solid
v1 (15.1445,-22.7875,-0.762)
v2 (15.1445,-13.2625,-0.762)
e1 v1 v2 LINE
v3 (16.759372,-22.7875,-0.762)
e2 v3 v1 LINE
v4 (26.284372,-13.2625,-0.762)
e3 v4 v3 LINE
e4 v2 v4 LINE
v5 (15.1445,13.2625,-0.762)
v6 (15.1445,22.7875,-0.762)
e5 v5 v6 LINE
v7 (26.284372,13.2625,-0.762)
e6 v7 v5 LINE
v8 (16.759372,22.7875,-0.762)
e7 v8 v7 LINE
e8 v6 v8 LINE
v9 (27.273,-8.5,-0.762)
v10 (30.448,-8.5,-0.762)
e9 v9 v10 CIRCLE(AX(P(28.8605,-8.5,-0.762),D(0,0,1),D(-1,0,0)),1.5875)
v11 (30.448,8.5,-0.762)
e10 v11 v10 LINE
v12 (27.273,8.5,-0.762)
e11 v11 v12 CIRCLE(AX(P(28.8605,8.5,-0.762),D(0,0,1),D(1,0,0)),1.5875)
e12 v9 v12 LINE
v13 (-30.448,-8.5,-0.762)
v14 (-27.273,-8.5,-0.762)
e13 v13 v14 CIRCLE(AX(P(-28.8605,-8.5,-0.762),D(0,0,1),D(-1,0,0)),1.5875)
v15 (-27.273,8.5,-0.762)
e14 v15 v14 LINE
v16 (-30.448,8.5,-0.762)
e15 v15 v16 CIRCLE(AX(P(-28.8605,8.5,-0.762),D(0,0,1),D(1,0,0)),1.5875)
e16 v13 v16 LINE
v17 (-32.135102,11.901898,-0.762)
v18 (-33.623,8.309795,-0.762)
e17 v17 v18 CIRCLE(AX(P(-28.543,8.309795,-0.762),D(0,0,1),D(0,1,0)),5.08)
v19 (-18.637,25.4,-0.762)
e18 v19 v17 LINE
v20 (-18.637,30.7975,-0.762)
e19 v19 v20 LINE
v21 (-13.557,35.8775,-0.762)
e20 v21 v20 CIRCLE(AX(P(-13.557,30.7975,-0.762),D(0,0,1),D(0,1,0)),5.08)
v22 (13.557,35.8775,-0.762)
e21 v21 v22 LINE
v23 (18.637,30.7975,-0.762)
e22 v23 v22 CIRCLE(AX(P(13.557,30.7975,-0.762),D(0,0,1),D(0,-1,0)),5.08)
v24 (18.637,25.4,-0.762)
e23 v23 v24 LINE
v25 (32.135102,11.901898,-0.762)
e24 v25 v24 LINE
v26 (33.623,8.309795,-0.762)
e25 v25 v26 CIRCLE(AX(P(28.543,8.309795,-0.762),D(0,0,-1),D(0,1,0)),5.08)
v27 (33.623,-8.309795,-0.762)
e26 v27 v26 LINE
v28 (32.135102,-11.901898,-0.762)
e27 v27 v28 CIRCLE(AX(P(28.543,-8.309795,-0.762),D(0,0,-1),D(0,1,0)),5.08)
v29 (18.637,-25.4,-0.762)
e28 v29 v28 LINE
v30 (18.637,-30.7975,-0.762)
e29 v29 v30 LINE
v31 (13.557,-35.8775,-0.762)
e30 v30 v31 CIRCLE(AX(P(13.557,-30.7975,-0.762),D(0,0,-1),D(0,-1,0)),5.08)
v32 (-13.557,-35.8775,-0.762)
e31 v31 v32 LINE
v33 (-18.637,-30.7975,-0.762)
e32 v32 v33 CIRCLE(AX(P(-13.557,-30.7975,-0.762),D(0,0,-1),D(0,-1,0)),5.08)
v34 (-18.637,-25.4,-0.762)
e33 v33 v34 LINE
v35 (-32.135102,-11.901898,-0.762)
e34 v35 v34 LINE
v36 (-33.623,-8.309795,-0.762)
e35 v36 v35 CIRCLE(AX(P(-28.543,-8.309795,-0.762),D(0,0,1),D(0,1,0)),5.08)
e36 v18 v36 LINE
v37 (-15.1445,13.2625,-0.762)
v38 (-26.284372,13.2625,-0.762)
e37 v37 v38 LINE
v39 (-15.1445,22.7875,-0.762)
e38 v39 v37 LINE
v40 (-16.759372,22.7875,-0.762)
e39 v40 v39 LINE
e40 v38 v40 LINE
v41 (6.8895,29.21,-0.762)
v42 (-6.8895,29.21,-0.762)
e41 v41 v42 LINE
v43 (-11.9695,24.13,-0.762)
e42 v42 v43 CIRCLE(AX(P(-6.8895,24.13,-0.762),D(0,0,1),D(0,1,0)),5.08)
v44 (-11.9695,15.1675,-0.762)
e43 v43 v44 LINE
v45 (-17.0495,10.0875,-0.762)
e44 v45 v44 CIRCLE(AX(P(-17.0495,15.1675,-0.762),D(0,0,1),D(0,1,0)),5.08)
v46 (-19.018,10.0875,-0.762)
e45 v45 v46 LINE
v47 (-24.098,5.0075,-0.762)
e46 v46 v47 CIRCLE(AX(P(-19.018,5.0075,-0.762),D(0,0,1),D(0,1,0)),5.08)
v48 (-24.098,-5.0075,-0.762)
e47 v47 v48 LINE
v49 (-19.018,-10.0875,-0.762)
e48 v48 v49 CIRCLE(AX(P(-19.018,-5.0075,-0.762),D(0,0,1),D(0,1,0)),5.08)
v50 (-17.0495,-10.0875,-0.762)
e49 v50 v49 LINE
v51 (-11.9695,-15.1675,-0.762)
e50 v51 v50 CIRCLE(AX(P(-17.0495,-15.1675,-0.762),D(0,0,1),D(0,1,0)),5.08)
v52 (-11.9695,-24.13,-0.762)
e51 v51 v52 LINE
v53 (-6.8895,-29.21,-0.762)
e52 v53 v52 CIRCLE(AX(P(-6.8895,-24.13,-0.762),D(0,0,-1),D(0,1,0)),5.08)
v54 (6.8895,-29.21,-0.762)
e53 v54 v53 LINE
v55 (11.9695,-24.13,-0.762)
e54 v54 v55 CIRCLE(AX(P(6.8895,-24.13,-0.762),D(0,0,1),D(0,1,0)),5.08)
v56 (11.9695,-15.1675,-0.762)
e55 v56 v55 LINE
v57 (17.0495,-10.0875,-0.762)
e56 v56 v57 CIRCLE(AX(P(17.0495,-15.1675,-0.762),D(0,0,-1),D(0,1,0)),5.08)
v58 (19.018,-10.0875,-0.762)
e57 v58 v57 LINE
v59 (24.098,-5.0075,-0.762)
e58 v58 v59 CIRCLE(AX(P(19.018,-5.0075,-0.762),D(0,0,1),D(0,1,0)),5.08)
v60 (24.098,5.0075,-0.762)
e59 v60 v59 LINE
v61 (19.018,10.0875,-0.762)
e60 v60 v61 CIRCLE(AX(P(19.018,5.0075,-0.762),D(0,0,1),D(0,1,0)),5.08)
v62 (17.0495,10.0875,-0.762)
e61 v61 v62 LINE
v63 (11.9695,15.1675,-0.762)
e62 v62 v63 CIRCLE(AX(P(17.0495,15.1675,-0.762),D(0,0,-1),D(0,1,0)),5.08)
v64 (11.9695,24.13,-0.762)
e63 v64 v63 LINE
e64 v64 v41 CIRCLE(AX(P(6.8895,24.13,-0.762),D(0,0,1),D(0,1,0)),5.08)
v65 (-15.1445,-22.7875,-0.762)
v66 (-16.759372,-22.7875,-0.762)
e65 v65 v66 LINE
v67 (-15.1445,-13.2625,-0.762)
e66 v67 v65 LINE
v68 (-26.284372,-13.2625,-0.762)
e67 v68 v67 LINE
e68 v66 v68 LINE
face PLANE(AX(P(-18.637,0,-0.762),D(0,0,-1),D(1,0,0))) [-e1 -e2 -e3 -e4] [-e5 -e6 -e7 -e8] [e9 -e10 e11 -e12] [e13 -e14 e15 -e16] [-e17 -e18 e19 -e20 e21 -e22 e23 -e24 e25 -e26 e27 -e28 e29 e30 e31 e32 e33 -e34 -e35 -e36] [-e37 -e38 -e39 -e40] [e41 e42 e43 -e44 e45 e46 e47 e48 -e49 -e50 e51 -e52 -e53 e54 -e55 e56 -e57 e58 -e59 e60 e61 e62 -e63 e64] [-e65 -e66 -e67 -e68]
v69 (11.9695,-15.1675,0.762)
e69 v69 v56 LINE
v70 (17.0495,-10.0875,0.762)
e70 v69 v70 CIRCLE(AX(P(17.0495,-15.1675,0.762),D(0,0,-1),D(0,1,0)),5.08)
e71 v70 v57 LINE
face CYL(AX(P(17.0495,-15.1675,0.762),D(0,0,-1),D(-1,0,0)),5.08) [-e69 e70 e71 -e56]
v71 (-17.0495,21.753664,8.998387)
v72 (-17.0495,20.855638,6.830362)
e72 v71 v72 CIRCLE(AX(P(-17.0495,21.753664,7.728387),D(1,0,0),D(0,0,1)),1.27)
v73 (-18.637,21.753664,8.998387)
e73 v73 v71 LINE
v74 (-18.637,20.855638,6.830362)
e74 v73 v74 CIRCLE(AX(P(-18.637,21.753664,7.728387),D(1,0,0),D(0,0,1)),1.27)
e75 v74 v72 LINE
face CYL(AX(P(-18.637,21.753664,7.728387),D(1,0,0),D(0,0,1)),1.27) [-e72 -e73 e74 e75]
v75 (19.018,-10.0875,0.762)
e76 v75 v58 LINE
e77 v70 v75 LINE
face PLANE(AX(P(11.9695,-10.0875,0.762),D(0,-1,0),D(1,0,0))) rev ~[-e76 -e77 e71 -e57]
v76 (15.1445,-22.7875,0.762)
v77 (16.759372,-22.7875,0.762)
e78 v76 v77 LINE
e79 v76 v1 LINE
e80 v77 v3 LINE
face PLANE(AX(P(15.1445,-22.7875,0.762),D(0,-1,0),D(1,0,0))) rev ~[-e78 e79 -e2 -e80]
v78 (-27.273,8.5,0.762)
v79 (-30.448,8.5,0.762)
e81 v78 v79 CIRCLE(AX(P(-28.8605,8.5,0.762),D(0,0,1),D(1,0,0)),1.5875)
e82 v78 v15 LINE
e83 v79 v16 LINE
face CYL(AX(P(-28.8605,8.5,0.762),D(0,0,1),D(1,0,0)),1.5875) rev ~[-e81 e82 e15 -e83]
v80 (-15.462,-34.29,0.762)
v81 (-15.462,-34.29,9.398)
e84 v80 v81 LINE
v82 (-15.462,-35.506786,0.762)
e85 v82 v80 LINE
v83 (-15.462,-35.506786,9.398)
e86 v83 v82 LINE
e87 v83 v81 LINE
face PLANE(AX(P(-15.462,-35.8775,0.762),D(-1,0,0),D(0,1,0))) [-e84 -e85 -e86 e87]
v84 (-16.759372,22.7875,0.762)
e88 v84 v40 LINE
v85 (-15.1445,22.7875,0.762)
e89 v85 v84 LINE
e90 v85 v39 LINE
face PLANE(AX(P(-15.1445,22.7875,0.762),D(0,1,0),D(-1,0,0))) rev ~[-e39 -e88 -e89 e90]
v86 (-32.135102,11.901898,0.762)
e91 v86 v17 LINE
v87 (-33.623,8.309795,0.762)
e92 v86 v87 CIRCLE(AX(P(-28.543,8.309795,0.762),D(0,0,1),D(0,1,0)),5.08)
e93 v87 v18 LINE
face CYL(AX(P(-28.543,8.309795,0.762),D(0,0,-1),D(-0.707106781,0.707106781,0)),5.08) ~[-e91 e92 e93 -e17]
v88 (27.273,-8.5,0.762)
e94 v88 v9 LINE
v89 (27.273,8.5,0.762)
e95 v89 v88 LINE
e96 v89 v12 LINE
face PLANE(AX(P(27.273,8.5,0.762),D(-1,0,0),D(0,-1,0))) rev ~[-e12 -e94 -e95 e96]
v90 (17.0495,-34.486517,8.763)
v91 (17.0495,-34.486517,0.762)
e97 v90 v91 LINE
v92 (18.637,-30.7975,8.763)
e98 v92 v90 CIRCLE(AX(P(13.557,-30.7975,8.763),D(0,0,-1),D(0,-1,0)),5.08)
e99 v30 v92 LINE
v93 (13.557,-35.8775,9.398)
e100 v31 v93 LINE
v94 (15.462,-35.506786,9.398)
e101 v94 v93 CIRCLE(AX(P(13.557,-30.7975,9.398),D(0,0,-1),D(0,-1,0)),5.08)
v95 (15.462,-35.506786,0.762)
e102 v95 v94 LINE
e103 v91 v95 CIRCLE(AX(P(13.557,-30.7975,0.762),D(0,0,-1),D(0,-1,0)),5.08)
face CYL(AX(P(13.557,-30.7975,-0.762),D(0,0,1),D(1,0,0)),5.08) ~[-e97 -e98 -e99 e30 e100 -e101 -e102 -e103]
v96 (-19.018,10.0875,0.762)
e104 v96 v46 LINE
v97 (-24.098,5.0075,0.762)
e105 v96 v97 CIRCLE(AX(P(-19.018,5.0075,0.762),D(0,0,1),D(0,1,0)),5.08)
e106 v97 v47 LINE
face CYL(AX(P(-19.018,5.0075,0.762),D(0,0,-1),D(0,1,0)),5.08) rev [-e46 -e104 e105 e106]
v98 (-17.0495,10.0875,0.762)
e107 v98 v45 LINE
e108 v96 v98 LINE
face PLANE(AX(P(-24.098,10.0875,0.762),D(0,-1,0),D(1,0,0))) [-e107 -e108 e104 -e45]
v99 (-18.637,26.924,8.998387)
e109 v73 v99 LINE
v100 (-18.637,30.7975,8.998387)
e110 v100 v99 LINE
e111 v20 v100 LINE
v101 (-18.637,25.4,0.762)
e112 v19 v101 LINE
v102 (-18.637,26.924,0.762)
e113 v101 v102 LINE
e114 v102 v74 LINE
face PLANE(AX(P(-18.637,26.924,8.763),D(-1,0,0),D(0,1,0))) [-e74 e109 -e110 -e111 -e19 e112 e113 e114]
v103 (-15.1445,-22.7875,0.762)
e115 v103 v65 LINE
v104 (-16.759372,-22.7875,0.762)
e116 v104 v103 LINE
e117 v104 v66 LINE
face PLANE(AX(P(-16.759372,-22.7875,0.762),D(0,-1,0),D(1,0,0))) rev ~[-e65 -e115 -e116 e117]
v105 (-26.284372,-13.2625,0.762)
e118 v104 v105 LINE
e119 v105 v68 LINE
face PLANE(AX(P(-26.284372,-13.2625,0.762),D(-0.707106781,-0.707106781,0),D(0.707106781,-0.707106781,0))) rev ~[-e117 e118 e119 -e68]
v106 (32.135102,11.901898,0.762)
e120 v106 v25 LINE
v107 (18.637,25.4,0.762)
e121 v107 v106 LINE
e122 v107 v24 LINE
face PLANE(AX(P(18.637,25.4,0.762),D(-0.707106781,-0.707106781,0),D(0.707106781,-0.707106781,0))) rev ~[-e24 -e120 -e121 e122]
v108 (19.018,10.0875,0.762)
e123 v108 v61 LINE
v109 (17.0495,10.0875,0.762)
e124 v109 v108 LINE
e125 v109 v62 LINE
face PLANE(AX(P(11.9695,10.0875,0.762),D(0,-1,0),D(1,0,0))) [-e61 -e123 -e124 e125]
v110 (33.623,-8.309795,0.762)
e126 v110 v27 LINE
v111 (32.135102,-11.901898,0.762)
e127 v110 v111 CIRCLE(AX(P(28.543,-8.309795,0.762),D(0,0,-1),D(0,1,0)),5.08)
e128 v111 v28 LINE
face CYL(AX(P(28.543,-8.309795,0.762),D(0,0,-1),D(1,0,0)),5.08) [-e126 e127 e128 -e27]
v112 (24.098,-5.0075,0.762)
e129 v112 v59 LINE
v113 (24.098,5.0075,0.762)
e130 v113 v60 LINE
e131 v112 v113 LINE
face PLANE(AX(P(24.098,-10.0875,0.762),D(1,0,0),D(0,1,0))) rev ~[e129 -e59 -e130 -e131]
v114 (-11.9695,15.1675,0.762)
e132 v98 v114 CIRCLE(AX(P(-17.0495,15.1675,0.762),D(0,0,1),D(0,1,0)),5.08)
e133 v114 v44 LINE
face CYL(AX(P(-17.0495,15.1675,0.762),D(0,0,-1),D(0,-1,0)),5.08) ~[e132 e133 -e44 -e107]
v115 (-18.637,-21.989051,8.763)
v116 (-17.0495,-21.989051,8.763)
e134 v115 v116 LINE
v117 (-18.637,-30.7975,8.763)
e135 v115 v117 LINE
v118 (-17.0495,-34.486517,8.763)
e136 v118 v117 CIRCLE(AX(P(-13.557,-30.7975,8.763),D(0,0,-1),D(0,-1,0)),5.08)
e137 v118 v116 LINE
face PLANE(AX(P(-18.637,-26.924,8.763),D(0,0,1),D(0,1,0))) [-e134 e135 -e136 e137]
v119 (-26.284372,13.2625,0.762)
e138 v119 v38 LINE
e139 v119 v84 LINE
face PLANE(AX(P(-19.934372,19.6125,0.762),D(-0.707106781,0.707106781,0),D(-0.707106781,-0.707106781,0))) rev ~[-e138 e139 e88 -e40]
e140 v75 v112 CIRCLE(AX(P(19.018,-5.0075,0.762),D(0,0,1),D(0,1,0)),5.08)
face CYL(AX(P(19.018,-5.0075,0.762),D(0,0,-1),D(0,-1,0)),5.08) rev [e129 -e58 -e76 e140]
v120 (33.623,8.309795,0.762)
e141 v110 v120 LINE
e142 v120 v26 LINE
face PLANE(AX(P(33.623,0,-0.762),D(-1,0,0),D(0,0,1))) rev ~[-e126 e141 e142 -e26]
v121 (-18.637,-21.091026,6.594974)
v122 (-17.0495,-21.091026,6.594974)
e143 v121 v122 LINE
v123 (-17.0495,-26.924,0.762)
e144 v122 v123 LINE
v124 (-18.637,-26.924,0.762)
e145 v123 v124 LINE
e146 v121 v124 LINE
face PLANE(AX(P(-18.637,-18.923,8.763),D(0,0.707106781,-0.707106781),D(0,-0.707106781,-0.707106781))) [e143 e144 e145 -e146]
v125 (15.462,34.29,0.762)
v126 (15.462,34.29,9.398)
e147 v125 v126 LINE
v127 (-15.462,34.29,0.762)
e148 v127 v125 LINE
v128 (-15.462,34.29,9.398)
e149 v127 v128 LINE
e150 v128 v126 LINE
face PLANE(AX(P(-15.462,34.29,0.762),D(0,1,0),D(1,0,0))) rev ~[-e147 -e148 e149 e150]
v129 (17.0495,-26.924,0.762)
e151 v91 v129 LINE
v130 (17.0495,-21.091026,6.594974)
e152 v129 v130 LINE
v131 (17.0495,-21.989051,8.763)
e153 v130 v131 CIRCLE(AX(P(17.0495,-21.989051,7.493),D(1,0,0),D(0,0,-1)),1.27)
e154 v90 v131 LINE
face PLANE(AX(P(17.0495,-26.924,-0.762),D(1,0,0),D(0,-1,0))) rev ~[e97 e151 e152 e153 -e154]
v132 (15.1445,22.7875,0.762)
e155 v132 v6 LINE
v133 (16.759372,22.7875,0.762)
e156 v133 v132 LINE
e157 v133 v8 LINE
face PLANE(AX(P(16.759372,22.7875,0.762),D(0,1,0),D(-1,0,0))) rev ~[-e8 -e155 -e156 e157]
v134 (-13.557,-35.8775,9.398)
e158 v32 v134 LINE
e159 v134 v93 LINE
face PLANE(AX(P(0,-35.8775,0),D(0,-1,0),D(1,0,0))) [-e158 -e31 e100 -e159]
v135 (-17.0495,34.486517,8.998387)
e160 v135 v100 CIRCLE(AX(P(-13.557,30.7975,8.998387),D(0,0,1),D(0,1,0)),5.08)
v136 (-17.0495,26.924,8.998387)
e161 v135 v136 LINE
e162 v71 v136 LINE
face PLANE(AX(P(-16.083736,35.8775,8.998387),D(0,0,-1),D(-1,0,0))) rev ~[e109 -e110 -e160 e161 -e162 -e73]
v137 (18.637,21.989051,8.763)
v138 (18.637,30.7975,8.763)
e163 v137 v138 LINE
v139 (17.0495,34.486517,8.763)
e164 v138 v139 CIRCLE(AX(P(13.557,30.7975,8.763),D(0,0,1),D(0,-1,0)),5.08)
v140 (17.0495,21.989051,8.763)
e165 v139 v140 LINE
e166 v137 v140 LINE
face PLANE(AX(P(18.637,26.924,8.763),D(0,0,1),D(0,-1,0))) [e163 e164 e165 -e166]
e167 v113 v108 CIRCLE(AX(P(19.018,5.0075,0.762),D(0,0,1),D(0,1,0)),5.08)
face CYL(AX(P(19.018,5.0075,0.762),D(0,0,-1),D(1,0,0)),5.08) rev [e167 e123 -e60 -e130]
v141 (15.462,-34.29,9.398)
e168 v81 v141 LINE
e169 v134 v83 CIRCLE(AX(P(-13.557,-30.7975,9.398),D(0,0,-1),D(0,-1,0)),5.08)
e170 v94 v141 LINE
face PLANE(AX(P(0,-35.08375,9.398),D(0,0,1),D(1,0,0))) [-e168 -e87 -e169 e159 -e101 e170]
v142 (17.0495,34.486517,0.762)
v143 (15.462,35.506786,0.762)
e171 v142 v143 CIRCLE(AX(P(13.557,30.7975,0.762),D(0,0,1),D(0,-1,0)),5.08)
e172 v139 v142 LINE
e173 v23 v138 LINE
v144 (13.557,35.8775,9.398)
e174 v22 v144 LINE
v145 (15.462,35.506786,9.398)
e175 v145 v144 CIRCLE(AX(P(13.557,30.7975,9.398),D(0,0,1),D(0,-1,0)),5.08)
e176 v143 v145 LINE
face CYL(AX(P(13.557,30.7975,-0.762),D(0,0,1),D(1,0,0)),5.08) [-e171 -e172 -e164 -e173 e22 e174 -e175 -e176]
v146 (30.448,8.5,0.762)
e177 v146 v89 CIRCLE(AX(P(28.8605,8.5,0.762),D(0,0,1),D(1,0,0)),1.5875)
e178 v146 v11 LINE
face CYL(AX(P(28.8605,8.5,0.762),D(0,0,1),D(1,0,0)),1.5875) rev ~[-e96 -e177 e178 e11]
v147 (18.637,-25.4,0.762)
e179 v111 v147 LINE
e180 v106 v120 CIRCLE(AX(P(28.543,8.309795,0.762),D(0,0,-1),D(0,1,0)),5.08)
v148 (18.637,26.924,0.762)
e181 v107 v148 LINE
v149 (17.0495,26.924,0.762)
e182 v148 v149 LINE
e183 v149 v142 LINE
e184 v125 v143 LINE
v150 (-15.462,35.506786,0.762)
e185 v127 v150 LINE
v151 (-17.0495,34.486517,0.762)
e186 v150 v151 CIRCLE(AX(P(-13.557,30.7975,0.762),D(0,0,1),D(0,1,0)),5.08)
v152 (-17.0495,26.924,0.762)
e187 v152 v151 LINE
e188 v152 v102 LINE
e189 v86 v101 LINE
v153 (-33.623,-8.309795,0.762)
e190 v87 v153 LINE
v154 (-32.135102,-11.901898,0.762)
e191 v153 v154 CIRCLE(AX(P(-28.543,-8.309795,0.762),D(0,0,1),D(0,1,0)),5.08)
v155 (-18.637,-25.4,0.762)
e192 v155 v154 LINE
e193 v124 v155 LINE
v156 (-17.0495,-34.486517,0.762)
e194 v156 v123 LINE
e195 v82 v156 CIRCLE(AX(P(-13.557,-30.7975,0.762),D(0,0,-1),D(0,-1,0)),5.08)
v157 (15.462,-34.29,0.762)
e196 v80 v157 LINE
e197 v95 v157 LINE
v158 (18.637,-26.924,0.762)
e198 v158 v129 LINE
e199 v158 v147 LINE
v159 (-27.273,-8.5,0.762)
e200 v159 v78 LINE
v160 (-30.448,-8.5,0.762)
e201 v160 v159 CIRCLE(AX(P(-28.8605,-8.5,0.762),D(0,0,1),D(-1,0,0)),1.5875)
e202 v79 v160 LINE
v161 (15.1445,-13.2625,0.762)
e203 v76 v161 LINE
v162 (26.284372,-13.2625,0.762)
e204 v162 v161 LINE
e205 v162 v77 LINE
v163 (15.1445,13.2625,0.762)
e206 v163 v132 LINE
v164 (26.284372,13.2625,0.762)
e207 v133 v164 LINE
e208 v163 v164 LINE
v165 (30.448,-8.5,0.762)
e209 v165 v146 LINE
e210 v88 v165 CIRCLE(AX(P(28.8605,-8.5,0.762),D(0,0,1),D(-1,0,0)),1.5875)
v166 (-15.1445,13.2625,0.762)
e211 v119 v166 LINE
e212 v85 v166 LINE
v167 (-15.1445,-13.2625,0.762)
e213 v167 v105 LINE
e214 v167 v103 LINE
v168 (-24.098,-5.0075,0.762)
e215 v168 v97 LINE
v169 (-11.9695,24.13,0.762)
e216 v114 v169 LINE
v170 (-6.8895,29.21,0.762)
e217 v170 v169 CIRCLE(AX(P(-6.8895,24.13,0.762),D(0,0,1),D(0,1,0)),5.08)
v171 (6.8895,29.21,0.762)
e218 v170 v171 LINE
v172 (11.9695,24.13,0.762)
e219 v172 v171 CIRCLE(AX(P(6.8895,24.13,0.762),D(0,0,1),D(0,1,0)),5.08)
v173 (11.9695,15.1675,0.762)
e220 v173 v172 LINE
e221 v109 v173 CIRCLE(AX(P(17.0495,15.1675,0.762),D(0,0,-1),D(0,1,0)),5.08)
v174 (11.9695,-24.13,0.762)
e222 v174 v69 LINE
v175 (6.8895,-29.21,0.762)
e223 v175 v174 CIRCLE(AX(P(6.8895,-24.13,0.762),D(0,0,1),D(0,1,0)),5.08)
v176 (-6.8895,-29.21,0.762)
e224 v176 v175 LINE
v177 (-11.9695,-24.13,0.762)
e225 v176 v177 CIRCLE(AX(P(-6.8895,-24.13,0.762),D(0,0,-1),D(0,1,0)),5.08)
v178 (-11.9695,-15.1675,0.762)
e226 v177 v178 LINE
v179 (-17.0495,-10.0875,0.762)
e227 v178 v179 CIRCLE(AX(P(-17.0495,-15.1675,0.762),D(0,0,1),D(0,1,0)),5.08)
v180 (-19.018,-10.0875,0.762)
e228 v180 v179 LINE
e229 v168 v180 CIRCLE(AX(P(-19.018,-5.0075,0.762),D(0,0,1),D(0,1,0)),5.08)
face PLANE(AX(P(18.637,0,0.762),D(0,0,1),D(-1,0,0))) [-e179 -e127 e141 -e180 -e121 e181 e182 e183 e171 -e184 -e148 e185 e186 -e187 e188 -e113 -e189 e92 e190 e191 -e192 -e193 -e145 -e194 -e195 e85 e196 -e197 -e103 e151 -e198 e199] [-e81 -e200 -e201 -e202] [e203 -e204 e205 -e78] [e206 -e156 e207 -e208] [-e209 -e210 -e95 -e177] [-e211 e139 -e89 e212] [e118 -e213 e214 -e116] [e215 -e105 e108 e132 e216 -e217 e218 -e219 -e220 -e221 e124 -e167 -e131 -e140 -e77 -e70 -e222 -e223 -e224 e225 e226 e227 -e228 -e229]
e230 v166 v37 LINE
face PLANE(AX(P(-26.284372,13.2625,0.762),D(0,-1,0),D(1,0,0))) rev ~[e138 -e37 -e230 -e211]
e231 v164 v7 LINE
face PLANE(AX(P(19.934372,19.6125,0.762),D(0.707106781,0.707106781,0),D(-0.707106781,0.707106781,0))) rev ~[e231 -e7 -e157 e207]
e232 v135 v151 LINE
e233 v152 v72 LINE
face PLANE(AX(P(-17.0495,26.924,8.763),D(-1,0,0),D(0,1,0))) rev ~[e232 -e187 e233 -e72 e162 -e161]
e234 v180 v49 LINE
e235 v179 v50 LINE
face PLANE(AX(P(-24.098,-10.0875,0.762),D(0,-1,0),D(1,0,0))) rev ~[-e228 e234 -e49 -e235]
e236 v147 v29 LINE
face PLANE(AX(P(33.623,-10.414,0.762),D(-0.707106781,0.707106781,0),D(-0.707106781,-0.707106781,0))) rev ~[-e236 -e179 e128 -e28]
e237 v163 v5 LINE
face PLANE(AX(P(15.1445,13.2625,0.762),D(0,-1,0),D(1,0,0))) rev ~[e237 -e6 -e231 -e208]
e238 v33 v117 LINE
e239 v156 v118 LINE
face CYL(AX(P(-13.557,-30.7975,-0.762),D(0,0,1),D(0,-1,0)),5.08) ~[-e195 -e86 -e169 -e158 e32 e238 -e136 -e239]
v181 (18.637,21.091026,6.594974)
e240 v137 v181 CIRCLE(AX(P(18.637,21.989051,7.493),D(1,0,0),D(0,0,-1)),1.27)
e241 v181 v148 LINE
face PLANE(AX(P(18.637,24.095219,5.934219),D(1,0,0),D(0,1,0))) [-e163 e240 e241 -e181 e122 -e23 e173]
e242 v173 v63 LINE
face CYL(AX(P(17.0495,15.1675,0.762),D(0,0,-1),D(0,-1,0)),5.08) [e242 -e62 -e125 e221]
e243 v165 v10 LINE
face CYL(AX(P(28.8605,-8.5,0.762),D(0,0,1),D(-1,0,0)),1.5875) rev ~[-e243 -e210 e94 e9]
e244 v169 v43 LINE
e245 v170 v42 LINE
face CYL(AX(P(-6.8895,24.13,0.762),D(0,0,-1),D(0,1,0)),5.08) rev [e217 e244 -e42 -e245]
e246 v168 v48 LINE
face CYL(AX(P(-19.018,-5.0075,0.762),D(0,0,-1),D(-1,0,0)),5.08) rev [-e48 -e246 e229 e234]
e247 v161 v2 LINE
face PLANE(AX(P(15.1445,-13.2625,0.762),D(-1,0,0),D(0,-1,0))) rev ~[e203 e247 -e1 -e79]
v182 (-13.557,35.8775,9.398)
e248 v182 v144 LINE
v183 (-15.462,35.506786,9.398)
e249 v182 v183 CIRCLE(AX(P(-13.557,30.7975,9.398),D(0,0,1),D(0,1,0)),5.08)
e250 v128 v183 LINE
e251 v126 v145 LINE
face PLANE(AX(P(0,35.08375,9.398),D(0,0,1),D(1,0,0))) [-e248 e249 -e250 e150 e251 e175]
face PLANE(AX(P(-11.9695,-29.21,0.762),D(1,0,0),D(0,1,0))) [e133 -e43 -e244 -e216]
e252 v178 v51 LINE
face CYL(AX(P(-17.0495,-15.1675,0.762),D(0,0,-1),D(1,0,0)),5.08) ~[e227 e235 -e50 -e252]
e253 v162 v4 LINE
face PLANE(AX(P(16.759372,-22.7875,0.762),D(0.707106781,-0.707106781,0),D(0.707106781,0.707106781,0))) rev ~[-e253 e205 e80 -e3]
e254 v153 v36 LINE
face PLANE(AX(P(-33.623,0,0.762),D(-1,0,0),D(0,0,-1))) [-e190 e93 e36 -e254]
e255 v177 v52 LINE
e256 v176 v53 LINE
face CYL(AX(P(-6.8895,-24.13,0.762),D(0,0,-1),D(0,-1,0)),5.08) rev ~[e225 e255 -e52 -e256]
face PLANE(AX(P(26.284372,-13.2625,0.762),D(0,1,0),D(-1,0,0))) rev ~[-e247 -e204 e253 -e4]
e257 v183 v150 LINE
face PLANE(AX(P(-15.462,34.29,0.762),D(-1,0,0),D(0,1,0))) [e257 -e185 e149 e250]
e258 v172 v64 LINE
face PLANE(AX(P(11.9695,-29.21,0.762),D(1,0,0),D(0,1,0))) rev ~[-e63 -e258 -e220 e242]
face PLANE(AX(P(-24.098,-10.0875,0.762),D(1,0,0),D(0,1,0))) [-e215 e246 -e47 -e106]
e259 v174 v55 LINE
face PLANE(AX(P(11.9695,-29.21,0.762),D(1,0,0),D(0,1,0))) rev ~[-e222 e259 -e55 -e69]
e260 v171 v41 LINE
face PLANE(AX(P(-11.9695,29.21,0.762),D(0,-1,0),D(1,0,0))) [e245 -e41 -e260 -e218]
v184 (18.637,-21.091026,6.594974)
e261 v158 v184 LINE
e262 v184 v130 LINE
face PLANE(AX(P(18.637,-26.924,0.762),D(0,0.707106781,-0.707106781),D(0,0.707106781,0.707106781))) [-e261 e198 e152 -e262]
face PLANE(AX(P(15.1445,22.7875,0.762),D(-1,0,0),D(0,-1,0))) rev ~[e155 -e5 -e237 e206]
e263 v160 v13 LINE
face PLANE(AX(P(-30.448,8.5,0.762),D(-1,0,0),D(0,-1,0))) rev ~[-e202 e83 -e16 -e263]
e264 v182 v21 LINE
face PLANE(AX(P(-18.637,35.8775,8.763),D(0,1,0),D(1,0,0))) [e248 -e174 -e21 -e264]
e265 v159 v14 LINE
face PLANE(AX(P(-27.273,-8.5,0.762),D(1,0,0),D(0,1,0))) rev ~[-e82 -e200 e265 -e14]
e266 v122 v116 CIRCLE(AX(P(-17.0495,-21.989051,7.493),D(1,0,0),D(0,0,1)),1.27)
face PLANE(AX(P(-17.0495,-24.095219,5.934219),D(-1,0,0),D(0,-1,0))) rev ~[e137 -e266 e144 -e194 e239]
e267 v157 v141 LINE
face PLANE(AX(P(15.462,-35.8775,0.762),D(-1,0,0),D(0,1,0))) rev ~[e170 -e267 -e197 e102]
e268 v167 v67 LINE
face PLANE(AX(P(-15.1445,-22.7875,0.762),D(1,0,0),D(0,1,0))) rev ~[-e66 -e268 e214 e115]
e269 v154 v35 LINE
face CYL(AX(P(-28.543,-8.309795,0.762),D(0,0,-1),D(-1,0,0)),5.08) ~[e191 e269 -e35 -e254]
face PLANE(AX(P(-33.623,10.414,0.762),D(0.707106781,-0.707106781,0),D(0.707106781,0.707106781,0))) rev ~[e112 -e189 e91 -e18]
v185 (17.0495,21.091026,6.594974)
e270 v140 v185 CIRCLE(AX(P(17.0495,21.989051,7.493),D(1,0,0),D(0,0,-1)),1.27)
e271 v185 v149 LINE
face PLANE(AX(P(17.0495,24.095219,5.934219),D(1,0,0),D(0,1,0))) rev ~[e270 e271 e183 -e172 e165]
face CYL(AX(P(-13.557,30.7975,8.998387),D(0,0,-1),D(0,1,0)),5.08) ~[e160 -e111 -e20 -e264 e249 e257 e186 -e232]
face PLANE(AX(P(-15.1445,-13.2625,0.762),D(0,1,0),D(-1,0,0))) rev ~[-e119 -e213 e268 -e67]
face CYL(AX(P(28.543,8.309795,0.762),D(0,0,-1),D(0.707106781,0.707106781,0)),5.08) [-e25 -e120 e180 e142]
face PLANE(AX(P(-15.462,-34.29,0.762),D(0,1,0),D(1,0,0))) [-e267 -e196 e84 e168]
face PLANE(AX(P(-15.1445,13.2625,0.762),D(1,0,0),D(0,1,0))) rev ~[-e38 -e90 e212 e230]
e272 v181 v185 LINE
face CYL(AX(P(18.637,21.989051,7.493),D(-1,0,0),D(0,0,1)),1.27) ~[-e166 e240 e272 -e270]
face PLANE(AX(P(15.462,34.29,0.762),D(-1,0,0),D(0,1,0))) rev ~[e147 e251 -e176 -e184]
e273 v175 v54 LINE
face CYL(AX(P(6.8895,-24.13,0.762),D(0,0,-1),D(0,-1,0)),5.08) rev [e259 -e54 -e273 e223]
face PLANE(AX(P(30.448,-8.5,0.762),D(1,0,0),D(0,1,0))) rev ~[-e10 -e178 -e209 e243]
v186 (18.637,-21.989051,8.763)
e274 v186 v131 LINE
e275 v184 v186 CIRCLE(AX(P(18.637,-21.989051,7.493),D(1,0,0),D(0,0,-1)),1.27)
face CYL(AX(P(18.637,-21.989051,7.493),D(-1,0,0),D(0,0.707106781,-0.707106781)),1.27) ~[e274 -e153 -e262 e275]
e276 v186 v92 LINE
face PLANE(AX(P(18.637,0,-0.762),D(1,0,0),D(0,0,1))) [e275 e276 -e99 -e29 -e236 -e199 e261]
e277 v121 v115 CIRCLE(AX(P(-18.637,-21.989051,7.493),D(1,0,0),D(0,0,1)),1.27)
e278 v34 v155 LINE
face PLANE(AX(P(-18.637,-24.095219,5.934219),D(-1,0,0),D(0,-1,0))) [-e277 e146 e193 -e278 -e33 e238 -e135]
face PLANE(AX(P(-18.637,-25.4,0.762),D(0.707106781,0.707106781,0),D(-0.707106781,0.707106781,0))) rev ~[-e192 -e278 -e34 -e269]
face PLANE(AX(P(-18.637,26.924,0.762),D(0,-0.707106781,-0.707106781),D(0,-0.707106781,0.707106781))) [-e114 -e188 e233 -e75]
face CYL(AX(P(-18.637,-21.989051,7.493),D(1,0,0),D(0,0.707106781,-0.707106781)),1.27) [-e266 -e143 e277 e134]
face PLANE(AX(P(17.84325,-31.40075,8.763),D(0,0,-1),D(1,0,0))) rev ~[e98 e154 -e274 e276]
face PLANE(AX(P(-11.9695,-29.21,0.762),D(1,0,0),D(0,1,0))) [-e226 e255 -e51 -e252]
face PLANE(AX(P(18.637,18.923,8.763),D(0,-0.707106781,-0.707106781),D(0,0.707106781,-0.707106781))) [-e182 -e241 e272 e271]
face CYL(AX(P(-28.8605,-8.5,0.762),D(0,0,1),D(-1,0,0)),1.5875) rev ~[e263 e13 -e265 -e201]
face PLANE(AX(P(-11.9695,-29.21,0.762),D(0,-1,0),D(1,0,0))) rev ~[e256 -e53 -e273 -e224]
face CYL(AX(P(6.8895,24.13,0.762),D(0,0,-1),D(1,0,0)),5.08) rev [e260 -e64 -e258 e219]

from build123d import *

# Parameters (mm, degrees)
F1_DEPTH        = 35.8775
F3_DEPTH        = 25.4
F4_W            = 1.5875
F4_H            = 8.9535
F5_DEPTH        = 9.525
F6_W            = 30.924
F6_H            = 1.5875
F5_FACE_W       = 1.5875
F5_FACE_H       = 8.9535
F7_DEPTH        = 8.636
F8_W            = 4.9497522414
F8_H            = 7.6485192403
F9_DEPTH        = 71.756
F10_W           = 23.939
F10_H           = 58.42
F11_DEPTH       = 1.525
F13_DEPTH       = 25.4
F14_W           = 12.1285
F14_H           = 20.175
F15_DEPTH       = 25.4
F16_F1_R        = 5.08
F16_F2_R        = 5.08
F16_S1_T1_DEPTH = 26.1520932665
F18_DEPTH       = 25.4
F20_DEPTH       = 1.5875
F22_DEPTH       = 1.5875
F23_R           = 1.27
F24_W           = 14.2291039228
F24_H           = 17.7929829806
F25_DEPTH       = 2.54


# Not quite as in the source:
# - a fillet or chamfer that OpenCascade refuses, or shapes differently, is made with other operations: its cross-section is extruded or revolved along the edge and cut away or added


with BuildPart() as f1:
    # F0 (on Front) → F1 (new body, symmetric)
    with BuildSketch(Plane.XZ):
        Polygon((17.875, 0.762), (-17.875, 0.762), (-18.637, 0.762), (-18.637, 0), (-18.637, -0.762), (18.637, -0.762), (18.637, 0), (18.637, 0.762), align=None)
    extrude(amount=F1_DEPTH, both=True)

    # F2 (on Front) → F3 (join, symmetric)
    with BuildSketch(Plane.XZ):
        Polygon((33.623, 0.762), (20.923, 0.762), (18.637, 0.762), (18.637, -0.762), (33.623, -0.762), align=None)
        Polygon((-18.637, 0.762), (-20.923, 0.762), (-33.623, 0.762), (-33.623, -0.762), (-18.637, -0.762), (-18.637, 0), align=None)
    extrude(amount=F3_DEPTH, both=True)

    # F4 (on face) → F5 (join)
    with BuildSketch(Plane(origin=(0, 0, -0.762), x_dir=(1, 0, 0), z_dir=(0, 0, -1))):
        with Locations((-17.84325, 31.40075)):
            Rectangle(F4_W, F4_H)
        with Locations((17.84325, 31.40075)):
            Rectangle(F4_W, F4_H)
        with Locations((-17.84325, -31.40075)):
            Rectangle(F4_W, F4_H)
        with Locations((17.84325, -31.40075)):
            Rectangle(F4_W, F4_H)
    extrude(amount=-F5_DEPTH)

    # F6 (on face) + F5_face (on face) → F7 (join)
    with BuildSketch(Plane.XY.offset(0.762)):
        with Locations((0, 35.08375)):
            Rectangle(F6_W, F6_H)
        with Locations((0, -35.08375)):
            Rectangle(F6_W, F6_H)
    with BuildSketch(Plane(origin=(-17.84325, 31.40075, 8.763), x_dir=(1, 0, 0), z_dir=(0, 0, 1))):
        Rectangle(F5_FACE_W, F5_FACE_H)
    extrude(amount=F7_DEPTH)

    # F8 (on face) → F9 (cut, through all)
    with BuildSketch(Plane(origin=(0, 35.8775, 0), x_dir=(-1, 0, 0), z_dir=(0, 1, 0))):
        with Locations((18.5586120933, 12.8226471134)):
            Rectangle(F8_W, F8_H)
    extrude(amount=-F9_DEPTH, mode=Mode.SUBTRACT)

    # F10 (on face) → F11 (cut, through all)
    with BuildSketch(Plane.XY.offset(0.762)):
        with BuildLine():
            ThreePointArc((-30.448, -8.5), (-28.8605, -10.0875), (-27.273, -8.5))
            Line((-27.273, -8.5), (-27.273, 8.5))
            ThreePointArc((-27.273, 8.5), (-28.8605, 10.0875), (-30.448, 8.5))
            Line((-30.448, 8.5), (-30.448, -8.5))
        make_face()
        with BuildLine():
            Line((27.273, 8.5), (27.273, -8.5))
            ThreePointArc((27.273, -8.5), (28.8605, -10.0875), (30.448, -8.5))
            Line((30.448, -8.5), (30.448, 8.5))
            ThreePointArc((30.448, 8.5), (28.8605, 10.0875), (27.273, 8.5))
        make_face()
        Rectangle(F10_W, F10_H)
    extrude(amount=-F11_DEPTH, mode=Mode.SUBTRACT)

    # F12 (on face) → F13 (cut)
    with BuildSketch(Plane.XY.offset(0.762)):
        Polygon((33.623, 25.4), (18.637, 25.4), (33.623, 10.414), align=None)
        Polygon((33.623, -10.414), (18.637, -25.4), (33.623, -25.4), align=None)
        Polygon((-18.637, 25.4), (-33.623, 25.4), (-33.623, 10.414), align=None)
        Polygon((-33.623, -10.414), (-33.623, -25.4), (-18.637, -25.4), align=None)
    extrude(amount=-F13_DEPTH, mode=Mode.SUBTRACT)

    # F14 (on face) → F15 (cut)
    with BuildSketch(Plane.XY.offset(0.762)):
        with Locations((-18.03375, 0)):
            Rectangle(F14_W, F14_H)
        with Locations((18.03375, 0)):
            Rectangle(F14_W, F14_H)
        Polygon((-15.1445, 16.4375), (-23.1093719395, 16.4375), (-26.2843719395, 13.2625), (-15.1445, 13.2625), align=None)
        Polygon((-19.9343719395, 19.6125), (-16.7593719395, 19.6125), (-15.1445, 19.6125), (-15.1445, 22.7875), (-16.7593719395, 22.7875), align=None)
        Polygon((16.7593719395, 19.6125), (19.9343719395, 19.6125), (16.7593719395, 22.7875), (15.1445, 22.7875), (15.1445, 19.6125), align=None)
        Polygon((23.1093719395, 16.4375), (15.1445, 16.4375), (15.1445, 13.2625), (26.2843719395, 13.2625), align=None)
        Polygon((26.2843719395, -13.2625), (15.1445, -13.2625), (15.1445, -16.4375), (23.1093719395, -16.4375), align=None)
        Polygon((16.7593719395, -22.7875), (19.9343719395, -19.6125), (16.7593719395, -19.6125), (15.1445, -19.6125), (15.1445, -22.7875), align=None)
        Polygon((-15.1445, -13.2625), (-26.2843719395, -13.2625), (-23.1093719395, -16.4375), (-15.1445, -16.4375), align=None)
        Polygon((-15.1445, -19.6125), (-16.7593719395, -19.6125), (-19.9343719395, -19.6125), (-16.7593719395, -22.7875), (-15.1445, -22.7875), align=None)
    extrude(amount=-F15_DEPTH, mode=Mode.SUBTRACT)

    # F16: fillet of radius 5.08 on 20 edges, made by hand

    # F16_f1
    f16_f1_edges = [f1.edges().sort_by_distance(p)[0] for p in [
        (-24.098, 10.0875, 0),
        (-24.098, -10.0875, 0),
        (-11.9695, 29.21, 0),
        (11.9695, 29.21, 0),
        (24.098, 10.0875, 0),
        (24.098, -10.0875, 0),
        (11.9695, -29.21, 0),
        (-11.9695, -29.21, 0),
    ]]
    fillet(f16_f1_edges, radius=F16_F1_R)

    # F16_f2
    f16_f2_edges = [f1.edges().sort_by_distance(p)[0] for p in [
        (-33.623, -10.414, 0),
        (-33.623, 10.414, 0),
        (-11.9695, -10.0875, 0),
        (-11.9695, 10.0875, 0),
        (11.9695, 10.0875, 0),
        (11.9695, -10.0875, 0),
        (33.623, -10.414, 0),
        (33.623, 10.414, 0),
        (18.637, 35.8775, 4.0005),
        (-18.637, 35.8775, 4.1181937466),
        (18.637, -35.8775, 4.0005),
        (-18.637, -35.8775, 4.0005),
    ]]
    fillet(f16_f2_edges, radius=F16_F2_R)

    # F16#s1: fillet of radius 5.08 on 1 edges, made by hand

    # F16_s1_s2 → F16_s1_t1 (cut)
    with BuildSketch(Plane.XY.offset(3.9469067335)):
        with BuildLine():
            ThreePointArc((-13.557, 35.8775), (-17.1491024484, 34.3896024484), (-18.637, 30.7975))
            Line((-18.637, 30.7975), (-18.637, 35.8775))
            Line((-18.637, 35.8775), (-13.557, 35.8775))
        make_face()
    extrude(amount=F16_S1_T1_DEPTH, mode=Mode.SUBTRACT)

    # F17 (on face) → F18 (cut)
    with BuildSketch(Plane.XY.offset(0.762)):
        Polygon((-15.1445, 19.6125), (-19.9343719395, 19.6125), (-23.1093719395, 16.4375), (-15.1445, 16.4375), align=None)
        Polygon((19.9343719395, 19.6125), (15.1445, 19.6125), (15.1445, 16.4375), (23.1093719395, 16.4375), align=None)
        Polygon((23.1093719395, -16.4375), (15.1445, -16.4375), (15.1445, -19.6125), (19.9343719395, -19.6125), align=None)
        Polygon((-15.1445, -16.4375), (-23.1093719395, -16.4375), (-19.9343719395, -19.6125), (-15.1445, -19.6125), align=None)
    extrude(amount=-F18_DEPTH, mode=Mode.SUBTRACT)

    # F19 (on face) → F20 (join)
    with BuildSketch(Plane.YZ.offset(18.637)):
        Polygon((18.923, 8.763), (26.924, 0.762), (26.924, 8.763), align=None)
        Polygon((-26.924, 8.763), (-26.924, 0.762), (-18.923, 8.763), align=None)
    extrude(amount=-F20_DEPTH)

    # F21 (on face) → F22 (join)
    with BuildSketch(Plane(origin=(-18.637, 0, 0), x_dir=(0, -1, 0), z_dir=(-1, 0, 0))):
        Polygon((18.923, 8.763), (26.924, 0.762), (26.924, 8.763), align=None)
        Polygon((-26.924, 8.9983874932), (-26.924, 0.762), (-18.6876125068, 8.9983874932), align=None)
    extrude(amount=-F22_DEPTH)

    # F23
    f23_edges = [f1.edges().sort_by_distance(p)[0] for p in [
        (-17.84325, 18.687613, 8.998387),
        (-17.84325, -18.923, 8.763),
        (17.84325, -18.923, 8.763),
        (17.84325, 18.923, 8.763),
    ]]
    fillet(f23_edges, radius=F23_R)

    # F24 (on face) → F25 (cut)
    with BuildSketch(Plane.XY.offset(17.399)):
        with Locations((-13.9599367976, 29.4290939346)):
            Rectangle(F24_W, F24_H)
    extrude(amount=-F25_DEPTH, mode=Mode.SUBTRACT)


solid = f1.part
